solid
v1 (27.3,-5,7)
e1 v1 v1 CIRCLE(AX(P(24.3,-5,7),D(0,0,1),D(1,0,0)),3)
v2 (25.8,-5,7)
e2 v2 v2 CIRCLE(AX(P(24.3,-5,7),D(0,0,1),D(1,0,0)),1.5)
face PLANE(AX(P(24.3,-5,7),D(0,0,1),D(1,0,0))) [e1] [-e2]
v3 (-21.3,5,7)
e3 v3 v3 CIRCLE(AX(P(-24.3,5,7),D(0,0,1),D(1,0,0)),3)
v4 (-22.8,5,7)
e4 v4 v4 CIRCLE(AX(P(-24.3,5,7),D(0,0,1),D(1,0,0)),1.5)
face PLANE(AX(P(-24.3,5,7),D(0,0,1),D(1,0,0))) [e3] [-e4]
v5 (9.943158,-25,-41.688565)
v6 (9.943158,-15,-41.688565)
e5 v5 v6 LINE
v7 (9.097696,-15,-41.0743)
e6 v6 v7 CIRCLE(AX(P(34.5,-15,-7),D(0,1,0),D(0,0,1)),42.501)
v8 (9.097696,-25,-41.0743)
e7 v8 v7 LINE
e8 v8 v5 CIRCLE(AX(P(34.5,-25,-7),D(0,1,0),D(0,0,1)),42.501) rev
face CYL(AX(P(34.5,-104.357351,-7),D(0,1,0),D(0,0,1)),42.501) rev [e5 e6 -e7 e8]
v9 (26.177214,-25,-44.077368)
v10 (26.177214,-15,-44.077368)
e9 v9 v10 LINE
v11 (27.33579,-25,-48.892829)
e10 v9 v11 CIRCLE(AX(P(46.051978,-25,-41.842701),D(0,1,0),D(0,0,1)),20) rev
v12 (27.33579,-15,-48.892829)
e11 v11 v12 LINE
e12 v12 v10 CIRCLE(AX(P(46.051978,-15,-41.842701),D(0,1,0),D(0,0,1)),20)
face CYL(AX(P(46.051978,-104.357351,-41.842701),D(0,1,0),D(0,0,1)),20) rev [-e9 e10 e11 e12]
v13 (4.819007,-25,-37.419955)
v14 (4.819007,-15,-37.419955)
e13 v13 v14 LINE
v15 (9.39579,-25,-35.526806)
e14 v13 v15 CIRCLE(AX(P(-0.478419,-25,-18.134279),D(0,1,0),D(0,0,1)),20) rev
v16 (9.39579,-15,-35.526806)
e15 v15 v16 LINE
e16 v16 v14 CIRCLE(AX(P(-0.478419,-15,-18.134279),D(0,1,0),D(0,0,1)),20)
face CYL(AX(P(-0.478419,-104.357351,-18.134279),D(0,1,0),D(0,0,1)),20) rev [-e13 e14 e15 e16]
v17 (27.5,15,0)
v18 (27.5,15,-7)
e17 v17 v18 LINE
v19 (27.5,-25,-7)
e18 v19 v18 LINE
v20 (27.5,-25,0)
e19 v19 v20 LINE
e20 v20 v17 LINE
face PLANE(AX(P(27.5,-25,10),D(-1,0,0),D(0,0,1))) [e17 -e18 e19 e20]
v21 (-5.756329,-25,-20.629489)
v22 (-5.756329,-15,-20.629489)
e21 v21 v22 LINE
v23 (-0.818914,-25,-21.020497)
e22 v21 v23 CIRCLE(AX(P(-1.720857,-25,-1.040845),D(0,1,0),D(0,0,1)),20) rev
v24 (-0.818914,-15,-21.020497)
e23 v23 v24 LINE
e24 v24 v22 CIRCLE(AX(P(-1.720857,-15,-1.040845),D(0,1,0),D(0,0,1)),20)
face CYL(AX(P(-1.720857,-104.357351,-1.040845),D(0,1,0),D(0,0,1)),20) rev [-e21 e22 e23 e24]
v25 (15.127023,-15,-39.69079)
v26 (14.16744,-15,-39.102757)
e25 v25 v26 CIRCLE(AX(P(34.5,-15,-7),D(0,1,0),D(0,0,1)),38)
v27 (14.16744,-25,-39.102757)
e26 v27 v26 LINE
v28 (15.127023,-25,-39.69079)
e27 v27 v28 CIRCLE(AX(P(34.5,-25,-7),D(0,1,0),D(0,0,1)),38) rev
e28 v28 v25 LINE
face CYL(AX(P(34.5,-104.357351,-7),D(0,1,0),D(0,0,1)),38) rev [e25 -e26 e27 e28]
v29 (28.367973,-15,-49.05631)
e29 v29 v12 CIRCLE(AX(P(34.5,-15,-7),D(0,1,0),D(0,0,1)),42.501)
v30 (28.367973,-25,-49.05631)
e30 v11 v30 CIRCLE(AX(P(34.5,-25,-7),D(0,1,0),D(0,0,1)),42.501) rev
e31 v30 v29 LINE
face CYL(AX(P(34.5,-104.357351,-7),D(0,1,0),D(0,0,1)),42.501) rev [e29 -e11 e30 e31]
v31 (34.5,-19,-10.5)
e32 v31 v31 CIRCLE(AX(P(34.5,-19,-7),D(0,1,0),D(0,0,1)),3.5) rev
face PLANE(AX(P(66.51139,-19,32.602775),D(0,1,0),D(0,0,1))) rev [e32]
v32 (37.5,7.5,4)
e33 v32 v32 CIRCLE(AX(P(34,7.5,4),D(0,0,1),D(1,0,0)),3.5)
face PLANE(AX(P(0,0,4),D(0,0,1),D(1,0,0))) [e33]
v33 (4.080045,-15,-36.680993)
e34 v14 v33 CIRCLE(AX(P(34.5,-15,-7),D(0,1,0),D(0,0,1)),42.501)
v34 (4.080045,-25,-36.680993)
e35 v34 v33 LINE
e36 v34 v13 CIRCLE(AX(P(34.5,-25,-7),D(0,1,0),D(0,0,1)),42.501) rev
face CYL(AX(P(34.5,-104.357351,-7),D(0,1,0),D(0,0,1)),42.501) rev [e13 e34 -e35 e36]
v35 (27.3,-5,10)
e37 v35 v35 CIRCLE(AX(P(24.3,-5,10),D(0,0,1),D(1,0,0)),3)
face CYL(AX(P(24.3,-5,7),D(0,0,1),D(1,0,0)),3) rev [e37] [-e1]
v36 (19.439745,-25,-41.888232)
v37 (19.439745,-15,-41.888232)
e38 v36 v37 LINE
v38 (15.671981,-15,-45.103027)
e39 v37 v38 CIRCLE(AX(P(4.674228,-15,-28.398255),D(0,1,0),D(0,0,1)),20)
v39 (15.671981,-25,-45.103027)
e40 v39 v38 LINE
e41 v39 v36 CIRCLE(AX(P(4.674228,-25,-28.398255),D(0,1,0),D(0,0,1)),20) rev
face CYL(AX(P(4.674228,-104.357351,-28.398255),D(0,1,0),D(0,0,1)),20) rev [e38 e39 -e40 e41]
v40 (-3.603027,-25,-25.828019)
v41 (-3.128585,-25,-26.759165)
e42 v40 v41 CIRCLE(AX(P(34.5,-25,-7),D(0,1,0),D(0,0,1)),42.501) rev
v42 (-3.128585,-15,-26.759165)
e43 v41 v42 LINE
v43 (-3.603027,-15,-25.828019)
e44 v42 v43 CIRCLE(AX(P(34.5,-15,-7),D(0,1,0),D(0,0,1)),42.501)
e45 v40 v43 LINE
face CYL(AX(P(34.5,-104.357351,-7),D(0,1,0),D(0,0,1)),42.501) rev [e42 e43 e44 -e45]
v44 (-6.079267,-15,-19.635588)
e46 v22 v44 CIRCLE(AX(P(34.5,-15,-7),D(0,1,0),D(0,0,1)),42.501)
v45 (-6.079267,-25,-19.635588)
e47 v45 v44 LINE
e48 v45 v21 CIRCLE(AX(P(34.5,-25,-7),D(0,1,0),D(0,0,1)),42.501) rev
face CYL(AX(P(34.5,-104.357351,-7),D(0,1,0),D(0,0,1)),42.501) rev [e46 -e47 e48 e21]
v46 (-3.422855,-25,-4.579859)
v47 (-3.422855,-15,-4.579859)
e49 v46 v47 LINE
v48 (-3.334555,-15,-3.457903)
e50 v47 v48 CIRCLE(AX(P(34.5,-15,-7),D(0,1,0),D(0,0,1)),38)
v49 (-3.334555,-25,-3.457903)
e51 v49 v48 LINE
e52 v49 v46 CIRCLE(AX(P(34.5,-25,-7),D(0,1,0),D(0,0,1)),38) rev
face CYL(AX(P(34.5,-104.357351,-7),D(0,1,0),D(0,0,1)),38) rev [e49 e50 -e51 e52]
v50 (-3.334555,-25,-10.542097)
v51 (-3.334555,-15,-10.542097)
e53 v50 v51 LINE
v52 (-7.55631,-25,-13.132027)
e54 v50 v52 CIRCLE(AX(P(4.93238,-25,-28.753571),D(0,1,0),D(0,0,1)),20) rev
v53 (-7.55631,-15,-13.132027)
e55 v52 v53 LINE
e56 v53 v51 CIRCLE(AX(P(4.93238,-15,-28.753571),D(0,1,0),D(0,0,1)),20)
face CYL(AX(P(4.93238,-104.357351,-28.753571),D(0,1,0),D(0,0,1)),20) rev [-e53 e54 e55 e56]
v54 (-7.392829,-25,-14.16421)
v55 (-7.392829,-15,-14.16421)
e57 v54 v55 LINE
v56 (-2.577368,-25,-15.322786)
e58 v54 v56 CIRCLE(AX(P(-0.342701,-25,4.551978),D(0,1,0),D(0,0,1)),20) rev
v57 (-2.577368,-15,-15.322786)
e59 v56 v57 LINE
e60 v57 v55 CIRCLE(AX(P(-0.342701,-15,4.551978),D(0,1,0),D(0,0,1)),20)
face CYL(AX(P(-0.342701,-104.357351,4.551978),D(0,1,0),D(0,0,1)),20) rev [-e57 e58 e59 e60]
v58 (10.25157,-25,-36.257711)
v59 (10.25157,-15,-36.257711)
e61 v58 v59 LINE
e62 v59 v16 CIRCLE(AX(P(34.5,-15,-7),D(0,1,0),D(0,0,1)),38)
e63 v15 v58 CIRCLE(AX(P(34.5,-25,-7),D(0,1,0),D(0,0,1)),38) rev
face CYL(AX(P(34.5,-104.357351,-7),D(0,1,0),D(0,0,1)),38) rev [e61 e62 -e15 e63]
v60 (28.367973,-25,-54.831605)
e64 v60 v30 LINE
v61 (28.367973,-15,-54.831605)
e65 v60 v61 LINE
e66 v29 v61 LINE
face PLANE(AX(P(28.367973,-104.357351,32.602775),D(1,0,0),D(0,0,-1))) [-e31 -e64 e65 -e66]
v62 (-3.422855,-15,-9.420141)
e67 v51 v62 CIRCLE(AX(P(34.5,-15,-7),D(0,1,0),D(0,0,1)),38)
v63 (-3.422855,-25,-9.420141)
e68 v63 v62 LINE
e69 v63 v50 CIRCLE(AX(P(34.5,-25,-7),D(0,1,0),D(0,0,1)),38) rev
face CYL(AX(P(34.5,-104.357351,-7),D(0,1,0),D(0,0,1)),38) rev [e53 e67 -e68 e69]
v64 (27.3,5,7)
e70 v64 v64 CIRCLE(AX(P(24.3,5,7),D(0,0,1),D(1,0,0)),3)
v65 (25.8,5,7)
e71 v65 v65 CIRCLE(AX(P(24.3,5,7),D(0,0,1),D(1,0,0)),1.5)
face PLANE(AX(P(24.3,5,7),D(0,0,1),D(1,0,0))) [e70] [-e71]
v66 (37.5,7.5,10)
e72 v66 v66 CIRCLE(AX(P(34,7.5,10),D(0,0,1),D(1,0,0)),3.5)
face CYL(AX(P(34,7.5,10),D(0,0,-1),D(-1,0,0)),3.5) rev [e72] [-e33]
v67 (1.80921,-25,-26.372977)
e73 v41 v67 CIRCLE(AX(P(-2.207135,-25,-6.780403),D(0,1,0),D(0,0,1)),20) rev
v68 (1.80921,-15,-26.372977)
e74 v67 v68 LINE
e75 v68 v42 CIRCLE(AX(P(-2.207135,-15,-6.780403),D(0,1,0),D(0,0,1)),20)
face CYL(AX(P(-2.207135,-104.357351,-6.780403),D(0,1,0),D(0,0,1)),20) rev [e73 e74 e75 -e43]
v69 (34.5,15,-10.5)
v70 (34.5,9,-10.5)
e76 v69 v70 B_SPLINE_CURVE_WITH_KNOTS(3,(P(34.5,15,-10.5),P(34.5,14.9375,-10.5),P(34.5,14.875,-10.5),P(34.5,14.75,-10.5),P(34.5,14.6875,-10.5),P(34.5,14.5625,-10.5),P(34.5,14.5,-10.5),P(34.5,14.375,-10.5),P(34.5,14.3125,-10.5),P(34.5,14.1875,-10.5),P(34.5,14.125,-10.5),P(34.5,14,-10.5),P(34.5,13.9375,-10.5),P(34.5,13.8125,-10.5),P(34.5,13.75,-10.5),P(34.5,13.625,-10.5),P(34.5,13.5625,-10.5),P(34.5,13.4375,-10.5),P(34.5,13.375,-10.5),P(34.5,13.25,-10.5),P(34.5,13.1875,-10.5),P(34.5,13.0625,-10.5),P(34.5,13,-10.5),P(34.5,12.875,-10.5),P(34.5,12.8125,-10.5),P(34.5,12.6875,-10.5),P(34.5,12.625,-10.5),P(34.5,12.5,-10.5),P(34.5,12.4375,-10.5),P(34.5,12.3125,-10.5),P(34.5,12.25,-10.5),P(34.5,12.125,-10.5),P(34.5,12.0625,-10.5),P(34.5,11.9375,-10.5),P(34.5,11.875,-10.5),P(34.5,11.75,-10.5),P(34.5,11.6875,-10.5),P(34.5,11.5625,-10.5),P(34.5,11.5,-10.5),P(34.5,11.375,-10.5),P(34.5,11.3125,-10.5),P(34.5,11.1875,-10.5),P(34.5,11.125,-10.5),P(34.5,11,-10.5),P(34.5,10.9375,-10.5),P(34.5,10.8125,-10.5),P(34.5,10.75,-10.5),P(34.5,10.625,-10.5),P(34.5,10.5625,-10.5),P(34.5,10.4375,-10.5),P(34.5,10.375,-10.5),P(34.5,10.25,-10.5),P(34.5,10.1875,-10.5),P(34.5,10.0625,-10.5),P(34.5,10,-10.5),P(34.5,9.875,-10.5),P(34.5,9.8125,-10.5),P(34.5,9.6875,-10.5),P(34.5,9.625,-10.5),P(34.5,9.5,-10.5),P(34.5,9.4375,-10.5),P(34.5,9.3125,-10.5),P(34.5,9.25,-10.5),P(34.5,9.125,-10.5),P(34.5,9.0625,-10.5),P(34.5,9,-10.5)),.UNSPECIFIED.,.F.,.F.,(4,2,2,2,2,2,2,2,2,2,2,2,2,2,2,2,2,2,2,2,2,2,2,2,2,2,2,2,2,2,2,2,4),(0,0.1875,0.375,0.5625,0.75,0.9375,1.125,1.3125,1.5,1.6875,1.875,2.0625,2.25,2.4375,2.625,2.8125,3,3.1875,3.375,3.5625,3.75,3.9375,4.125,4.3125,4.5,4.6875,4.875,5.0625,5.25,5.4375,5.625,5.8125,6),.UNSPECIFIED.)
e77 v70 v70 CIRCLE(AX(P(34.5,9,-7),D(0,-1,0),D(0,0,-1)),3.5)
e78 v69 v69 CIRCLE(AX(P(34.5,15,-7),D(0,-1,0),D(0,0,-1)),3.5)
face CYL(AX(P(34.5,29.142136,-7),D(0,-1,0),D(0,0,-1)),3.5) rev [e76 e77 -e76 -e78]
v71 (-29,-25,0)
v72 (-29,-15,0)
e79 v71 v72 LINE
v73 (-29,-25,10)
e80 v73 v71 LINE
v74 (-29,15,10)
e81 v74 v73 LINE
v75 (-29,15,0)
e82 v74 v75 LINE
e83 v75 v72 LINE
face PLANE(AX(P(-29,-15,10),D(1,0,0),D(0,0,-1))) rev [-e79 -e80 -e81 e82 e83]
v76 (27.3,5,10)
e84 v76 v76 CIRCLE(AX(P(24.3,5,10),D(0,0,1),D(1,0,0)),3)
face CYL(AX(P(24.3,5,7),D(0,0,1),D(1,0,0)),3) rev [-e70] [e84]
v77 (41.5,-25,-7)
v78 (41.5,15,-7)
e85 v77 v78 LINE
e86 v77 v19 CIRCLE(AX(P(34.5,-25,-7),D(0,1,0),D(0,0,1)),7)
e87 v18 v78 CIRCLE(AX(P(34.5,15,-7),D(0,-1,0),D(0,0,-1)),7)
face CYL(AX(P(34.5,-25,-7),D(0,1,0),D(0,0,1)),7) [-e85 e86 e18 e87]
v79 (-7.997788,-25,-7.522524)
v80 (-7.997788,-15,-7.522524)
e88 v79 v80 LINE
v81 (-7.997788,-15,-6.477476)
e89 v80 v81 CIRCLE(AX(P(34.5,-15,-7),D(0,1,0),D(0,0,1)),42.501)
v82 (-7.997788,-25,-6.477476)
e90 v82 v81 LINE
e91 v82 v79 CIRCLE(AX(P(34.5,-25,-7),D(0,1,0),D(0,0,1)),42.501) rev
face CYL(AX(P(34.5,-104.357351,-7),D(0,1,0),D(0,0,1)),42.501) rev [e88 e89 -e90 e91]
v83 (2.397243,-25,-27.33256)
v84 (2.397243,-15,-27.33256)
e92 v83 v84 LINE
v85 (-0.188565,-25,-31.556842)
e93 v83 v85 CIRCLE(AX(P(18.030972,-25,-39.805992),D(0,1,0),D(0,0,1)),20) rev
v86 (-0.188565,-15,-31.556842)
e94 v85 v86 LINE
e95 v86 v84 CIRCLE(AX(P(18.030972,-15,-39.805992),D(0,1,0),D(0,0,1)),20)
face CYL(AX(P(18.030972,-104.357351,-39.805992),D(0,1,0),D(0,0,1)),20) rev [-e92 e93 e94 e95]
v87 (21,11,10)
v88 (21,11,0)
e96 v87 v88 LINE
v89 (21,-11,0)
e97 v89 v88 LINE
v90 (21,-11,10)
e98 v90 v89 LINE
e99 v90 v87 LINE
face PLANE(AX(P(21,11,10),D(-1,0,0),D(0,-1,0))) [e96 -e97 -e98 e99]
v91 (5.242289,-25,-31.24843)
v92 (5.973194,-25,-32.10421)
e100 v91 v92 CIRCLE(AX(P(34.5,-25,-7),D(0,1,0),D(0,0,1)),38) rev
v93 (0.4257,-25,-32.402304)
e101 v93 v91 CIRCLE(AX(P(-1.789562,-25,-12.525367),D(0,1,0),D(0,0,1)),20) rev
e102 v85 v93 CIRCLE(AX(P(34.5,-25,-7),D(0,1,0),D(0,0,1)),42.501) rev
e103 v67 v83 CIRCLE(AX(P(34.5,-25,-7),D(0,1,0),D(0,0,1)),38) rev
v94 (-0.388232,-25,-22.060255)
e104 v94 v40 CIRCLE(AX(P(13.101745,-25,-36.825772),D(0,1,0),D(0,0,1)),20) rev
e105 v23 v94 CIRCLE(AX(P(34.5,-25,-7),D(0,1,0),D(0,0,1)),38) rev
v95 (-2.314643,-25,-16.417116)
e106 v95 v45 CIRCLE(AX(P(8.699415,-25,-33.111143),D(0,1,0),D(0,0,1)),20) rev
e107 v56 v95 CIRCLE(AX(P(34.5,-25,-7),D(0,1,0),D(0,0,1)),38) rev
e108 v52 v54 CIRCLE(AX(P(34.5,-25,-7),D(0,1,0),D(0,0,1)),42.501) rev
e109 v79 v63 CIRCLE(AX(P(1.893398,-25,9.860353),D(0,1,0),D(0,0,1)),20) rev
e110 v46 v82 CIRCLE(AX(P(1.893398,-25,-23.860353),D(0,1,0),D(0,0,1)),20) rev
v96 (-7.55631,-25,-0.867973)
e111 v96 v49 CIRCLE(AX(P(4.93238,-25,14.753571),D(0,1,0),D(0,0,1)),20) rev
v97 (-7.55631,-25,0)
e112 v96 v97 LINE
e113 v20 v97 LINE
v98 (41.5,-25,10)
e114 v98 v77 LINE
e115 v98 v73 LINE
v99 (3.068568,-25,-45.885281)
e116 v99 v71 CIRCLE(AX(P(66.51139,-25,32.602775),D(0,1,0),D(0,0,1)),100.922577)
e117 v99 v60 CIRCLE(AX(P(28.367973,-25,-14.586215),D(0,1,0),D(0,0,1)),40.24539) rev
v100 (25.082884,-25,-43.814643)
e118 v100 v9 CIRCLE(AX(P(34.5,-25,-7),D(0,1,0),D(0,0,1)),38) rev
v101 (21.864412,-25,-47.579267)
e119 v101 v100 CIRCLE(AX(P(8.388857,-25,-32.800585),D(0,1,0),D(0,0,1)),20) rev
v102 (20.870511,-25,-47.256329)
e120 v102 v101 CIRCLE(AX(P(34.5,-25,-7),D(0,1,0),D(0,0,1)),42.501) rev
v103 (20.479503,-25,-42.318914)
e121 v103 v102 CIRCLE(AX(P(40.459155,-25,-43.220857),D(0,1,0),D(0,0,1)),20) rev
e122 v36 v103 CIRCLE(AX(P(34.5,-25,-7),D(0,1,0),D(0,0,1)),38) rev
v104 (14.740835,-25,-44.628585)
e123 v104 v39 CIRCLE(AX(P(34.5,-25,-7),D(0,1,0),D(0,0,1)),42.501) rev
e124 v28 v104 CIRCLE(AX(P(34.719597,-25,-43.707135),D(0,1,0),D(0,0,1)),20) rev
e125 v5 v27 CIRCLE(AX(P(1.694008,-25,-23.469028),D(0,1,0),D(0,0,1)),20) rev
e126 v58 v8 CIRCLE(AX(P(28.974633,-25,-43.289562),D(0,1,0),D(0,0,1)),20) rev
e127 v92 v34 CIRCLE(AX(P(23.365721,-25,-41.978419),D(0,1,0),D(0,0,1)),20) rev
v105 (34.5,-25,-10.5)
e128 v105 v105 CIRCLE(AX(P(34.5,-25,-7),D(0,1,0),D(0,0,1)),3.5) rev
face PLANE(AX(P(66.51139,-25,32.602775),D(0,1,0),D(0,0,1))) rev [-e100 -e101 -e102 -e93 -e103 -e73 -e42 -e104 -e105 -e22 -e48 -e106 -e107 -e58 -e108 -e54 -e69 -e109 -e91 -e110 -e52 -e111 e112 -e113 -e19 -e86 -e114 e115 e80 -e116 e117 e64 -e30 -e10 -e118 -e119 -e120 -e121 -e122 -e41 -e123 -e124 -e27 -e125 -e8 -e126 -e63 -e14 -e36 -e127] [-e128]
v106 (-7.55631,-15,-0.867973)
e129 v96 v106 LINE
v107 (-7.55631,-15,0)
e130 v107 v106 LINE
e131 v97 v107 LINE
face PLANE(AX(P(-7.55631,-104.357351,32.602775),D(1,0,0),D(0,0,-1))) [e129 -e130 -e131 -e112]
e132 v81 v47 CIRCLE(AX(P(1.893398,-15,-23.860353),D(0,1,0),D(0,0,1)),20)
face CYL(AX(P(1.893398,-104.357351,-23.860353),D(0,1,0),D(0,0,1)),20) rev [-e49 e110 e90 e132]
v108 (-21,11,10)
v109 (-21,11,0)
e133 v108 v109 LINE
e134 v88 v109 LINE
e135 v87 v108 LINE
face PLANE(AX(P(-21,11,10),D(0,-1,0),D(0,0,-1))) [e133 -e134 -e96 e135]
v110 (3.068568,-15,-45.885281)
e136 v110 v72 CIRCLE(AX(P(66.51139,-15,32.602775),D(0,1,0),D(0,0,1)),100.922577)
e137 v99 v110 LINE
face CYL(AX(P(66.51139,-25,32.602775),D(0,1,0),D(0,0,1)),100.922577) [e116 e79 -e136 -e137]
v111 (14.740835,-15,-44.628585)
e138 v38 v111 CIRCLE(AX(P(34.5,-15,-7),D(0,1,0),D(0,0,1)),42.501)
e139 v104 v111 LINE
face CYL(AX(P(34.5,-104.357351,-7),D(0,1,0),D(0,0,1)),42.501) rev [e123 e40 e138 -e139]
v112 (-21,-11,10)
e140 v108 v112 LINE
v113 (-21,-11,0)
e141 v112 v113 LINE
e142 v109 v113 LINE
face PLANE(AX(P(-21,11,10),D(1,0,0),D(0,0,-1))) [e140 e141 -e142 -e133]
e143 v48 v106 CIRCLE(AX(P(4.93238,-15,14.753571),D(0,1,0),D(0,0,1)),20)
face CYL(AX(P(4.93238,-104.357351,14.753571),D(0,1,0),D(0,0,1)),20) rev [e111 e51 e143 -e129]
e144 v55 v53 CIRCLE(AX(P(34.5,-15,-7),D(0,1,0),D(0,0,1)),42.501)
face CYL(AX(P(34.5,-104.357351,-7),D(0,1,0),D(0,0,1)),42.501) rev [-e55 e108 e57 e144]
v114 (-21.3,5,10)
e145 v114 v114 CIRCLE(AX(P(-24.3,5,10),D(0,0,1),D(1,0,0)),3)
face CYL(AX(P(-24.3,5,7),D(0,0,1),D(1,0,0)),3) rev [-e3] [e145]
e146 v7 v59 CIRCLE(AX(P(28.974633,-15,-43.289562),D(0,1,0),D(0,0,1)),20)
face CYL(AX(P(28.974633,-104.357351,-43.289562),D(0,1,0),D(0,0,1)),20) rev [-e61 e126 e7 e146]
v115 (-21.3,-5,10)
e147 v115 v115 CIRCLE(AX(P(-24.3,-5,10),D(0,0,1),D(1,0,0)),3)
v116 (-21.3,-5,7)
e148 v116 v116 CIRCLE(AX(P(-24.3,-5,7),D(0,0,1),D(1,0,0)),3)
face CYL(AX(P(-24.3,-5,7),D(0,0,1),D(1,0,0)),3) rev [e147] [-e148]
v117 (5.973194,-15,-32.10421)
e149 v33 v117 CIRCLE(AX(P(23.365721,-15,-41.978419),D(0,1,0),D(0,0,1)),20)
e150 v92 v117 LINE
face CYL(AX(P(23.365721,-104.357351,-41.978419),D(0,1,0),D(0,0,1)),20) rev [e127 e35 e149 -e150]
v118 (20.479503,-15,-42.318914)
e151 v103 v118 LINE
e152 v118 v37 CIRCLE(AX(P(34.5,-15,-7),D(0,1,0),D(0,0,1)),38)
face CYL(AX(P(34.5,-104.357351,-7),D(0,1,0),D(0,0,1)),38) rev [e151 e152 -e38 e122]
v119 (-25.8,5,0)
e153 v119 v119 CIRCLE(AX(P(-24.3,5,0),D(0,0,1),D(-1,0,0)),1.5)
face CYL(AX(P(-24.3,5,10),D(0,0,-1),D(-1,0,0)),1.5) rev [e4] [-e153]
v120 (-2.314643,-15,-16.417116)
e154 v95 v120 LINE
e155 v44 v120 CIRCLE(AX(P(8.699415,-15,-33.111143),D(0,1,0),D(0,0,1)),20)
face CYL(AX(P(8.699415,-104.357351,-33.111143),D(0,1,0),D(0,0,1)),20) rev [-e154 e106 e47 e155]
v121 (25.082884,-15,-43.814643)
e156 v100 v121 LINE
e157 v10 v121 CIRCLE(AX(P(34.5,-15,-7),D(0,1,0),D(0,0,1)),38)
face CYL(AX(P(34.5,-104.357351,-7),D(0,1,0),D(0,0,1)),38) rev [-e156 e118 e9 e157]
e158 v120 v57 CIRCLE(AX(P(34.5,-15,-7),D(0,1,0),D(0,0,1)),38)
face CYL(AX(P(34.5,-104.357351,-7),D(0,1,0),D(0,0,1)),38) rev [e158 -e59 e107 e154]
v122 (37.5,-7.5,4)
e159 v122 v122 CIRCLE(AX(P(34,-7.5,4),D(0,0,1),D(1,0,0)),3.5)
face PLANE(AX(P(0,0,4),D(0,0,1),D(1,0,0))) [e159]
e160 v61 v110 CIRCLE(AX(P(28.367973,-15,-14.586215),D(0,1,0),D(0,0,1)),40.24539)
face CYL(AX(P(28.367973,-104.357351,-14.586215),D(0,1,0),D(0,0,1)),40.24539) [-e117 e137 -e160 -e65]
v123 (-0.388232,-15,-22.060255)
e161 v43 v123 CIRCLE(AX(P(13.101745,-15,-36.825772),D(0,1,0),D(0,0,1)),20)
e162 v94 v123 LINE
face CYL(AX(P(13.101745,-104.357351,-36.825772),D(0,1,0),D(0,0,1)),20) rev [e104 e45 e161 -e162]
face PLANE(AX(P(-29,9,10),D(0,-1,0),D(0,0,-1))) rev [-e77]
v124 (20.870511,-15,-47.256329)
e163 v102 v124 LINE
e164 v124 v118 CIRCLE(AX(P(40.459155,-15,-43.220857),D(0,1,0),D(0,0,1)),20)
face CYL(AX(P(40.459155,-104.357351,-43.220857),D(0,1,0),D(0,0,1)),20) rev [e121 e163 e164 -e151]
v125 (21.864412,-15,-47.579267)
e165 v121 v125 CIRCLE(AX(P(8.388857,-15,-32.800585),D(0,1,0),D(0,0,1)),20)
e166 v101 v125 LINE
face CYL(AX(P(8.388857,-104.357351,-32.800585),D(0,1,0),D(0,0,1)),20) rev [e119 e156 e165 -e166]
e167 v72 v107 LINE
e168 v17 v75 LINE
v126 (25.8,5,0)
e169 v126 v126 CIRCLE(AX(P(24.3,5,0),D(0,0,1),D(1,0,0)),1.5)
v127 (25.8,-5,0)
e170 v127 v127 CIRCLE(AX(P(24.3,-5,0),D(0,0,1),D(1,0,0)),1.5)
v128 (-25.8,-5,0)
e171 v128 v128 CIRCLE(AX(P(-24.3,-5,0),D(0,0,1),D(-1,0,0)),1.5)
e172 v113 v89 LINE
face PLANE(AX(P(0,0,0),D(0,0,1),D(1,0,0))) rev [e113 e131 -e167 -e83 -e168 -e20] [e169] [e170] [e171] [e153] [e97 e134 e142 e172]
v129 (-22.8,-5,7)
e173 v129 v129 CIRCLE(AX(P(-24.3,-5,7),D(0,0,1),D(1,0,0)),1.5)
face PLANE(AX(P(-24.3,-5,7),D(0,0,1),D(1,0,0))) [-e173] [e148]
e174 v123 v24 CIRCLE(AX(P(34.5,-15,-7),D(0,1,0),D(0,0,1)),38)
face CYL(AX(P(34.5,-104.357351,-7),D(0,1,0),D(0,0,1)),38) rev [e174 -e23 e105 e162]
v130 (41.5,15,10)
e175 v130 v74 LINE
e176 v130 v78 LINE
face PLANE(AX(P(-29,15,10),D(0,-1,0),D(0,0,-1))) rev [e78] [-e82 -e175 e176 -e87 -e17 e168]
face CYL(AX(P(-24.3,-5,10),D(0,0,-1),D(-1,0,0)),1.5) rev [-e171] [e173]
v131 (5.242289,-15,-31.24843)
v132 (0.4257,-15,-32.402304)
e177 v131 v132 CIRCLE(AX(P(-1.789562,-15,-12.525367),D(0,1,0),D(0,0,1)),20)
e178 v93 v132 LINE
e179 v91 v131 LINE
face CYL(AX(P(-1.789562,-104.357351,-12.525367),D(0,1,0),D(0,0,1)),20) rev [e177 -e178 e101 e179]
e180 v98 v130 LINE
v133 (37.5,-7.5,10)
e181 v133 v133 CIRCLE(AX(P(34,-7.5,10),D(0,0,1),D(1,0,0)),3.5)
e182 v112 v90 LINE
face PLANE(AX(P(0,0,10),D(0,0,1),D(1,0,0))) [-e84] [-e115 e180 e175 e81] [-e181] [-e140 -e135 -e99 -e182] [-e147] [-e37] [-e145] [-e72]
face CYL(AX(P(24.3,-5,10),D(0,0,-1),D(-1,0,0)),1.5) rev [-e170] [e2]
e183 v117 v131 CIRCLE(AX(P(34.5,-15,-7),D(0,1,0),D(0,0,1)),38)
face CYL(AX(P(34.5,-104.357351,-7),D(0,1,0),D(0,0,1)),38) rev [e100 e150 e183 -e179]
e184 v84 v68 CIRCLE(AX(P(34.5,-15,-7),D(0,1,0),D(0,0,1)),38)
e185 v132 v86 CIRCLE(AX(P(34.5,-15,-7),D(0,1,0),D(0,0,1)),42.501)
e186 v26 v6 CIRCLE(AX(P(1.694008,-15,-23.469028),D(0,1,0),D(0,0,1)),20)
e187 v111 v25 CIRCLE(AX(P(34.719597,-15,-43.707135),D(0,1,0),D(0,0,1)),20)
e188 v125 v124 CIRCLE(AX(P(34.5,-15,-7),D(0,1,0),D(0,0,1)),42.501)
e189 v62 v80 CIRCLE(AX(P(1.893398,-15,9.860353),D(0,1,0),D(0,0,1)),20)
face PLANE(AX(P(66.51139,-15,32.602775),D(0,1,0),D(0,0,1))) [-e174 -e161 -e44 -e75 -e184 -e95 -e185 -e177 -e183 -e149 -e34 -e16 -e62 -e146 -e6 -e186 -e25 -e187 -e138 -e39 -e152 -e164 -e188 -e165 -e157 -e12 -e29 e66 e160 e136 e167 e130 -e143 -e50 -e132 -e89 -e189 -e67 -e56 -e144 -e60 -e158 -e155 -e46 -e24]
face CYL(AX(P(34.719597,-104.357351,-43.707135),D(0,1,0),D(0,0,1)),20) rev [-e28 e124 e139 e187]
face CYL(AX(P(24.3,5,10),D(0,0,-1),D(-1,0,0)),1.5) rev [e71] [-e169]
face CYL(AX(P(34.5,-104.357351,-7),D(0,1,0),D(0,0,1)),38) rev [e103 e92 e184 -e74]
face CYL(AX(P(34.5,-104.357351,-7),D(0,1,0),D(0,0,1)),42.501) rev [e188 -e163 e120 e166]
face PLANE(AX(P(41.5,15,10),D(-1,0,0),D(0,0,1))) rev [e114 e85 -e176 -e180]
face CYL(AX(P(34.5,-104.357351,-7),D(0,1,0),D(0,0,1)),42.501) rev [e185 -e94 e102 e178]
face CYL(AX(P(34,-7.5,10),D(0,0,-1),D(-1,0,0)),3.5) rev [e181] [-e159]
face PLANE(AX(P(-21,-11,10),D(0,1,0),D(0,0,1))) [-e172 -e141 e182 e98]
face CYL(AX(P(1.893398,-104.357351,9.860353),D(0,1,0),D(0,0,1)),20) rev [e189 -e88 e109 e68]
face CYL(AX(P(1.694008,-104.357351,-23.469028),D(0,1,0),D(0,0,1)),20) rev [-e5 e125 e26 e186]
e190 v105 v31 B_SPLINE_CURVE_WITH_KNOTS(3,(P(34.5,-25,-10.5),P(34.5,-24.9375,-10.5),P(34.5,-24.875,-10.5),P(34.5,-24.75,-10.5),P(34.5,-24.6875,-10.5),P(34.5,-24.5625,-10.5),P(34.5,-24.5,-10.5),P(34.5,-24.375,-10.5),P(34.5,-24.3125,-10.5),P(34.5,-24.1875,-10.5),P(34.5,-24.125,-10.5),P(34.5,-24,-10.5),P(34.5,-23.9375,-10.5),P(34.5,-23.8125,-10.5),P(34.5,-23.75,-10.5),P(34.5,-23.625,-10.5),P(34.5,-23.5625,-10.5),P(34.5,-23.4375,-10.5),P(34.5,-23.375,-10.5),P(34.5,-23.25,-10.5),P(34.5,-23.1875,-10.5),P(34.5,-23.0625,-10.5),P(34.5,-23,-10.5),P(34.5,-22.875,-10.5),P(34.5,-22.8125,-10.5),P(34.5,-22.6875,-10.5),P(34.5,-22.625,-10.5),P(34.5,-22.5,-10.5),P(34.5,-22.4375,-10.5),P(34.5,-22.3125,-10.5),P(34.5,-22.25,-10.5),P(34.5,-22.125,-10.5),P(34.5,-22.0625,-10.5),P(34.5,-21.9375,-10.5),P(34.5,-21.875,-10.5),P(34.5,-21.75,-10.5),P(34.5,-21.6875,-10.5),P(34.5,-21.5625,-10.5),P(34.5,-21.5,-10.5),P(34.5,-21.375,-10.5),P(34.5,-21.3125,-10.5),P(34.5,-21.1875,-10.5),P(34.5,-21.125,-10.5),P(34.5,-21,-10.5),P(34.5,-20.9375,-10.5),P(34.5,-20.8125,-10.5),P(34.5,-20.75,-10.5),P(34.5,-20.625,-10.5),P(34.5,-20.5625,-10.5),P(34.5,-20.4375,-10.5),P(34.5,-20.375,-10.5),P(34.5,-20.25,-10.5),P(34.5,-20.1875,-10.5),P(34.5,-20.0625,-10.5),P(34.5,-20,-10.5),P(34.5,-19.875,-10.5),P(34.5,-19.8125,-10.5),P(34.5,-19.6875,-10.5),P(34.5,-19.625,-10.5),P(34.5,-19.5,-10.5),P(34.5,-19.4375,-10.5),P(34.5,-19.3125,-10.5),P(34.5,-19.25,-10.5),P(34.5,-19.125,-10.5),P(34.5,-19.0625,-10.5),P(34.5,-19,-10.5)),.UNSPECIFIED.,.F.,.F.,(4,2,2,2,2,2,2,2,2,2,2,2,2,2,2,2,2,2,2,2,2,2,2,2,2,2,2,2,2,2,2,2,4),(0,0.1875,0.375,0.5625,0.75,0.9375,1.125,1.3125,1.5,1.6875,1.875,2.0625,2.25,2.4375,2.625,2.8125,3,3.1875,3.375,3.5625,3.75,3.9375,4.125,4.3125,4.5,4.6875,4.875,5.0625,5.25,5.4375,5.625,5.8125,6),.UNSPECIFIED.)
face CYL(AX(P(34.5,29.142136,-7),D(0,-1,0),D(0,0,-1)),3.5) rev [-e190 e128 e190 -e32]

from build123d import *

# Parameters (mm, degrees)
SKETCH1_R                = 3.5
SKETCH1_R_2              = 1.5
SKETCH1_W                = 42
SKETCH1_H                = 22
BOSS_EXTRUDE1_DEPTH      = 10
CUT_EXTRUDE1_START       = 7
SKETCH2_R                = 3
CUT_EXTRUDE1_DEPTH       = 3
BOSS_EXTRUDE2_START      = -15
SKETCH4_R                = 5
BOSS_EXTRUDE2_DEPTH      = 10
BOSS_EXTRUDE3_DEPTH      = 15
BOSS_EXTRUDE3_DEPTH_BACK = 25
SKETCH4_3_R              = 5
SKETCH1_3_R              = 3.5
BOSS_EXTRUDE4_DEPTH      = 4
BOSS_EXTRUDE5_START      = -15
BOSS_EXTRUDE5_DEPTH      = 10
BOSS_EXTRUDE6_DEPTH      = 15
BOSS_EXTRUDE6_DEPTH_BACK = 25
SKETCH6_R                = 5
SKETCH6_R_2              = 3.5
BOSS_EXTRUDE7_START      = -19
SKETCH6_2_R              = 3.5
BOSS_EXTRUDE7_DEPTH      = 28


with BuildPart() as part:
    # Sketch1 → Boss-Extrude1 (new body)
    with BuildSketch(Plane.XY):
        Polygon((34, -15), (-29, -15), (-29, 15), (34, 15), (41.5, 15), (41.5, 7.5), (41.5, -7.5), (41.5, -15), align=None)
        with Locations((34, -7.5)):
            Circle(SKETCH1_R, mode=Mode.SUBTRACT)
        with Locations((34, 7.5)):
            Circle(SKETCH1_R, mode=Mode.SUBTRACT)
        with Locations((24.3, 5)):
            Circle(SKETCH1_R_2, mode=Mode.SUBTRACT)
        with Locations((24.3, -5)):
            Circle(SKETCH1_R_2, mode=Mode.SUBTRACT)
        with Locations(Location((-24.3, -5, 0), (0, 0, 180))):
            Circle(SKETCH1_R_2, mode=Mode.SUBTRACT)
        with Locations(Location((-24.3, 5, 0), (0, 0, 180))):
            Circle(SKETCH1_R_2, mode=Mode.SUBTRACT)
        Rectangle(SKETCH1_W, SKETCH1_H, mode=Mode.SUBTRACT)
    extrude(amount=BOSS_EXTRUDE1_DEPTH)

    # Sketch2 → Cut-Extrude1 (cut)
    with BuildSketch(Plane.XY.offset(CUT_EXTRUDE1_START)):
        with Locations((-24.3, 5)):
            Circle(SKETCH2_R)
        with Locations((-24.3, -5)):
            Circle(SKETCH2_R)
        with Locations((24.3, 5)):
            Circle(SKETCH2_R)
        with Locations((24.3, -5)):
            Circle(SKETCH2_R)
    extrude(amount=CUT_EXTRUDE1_DEPTH, mode=Mode.SUBTRACT)

    # Sketch4 → Boss-Extrude2 (add)
    # profile 1 of 3: a face of its own
    with BuildSketch(Plane(origin=(0, 0, 0), x_dir=(1, 0, 0), z_dir=(0, 1, 0)).offset(BOSS_EXTRUDE2_START)):
        with BuildLine():
            Line((41.5, 0), (41.5, 7))
            ThreePointArc((41.5, 7), (34.5, 14), (27.5, 7))
            Line((27.5, 7), (27.5, 0))
            Line((27.5, 0), (41.5, 0))
        make_face()
        with Locations((34.5, 7)):
            Circle(SKETCH4_R, mode=Mode.SUBTRACT)
    # profile 2 of 3: a face of its own
    with BuildSketch(Plane(origin=(0, 0, 0), x_dir=(1, 0, 0), z_dir=(0, 1, 0)).offset(BOSS_EXTRUDE2_START)):
        Polygon((-29, -10), (-29, 0), (27.5, 0), (41.5, 0), (41.5, -10), align=None)
    # profile 3 of 3: a face of its own
    with BuildSketch(Plane(origin=(0, 0, 0), x_dir=(1, 0, 0), z_dir=(0, 1, 0)).offset(BOSS_EXTRUDE2_START)):
        with BuildLine():
            Line((-29, 0), (-9.952221542, 0))
            ThreePointArc((-9.952221542, 0), (-7.49675311, 23.163932944), (6.211711403, 41.99675311))
            Line((6.211711403, 41.99675311), (3.068568225, 45.885281233))
            ThreePointArc((3.068568225, 45.885281233), (-16.210887038, 25.210644422), (-29, 0))
        make_face()
    extrude(amount=-BOSS_EXTRUDE2_DEPTH)

    # Sketch4<3> → Boss-Extrude3 (add, two sides: drawn at the far end of the back side and taken through both)
    with BuildSketch(Plane(origin=(0, 0, 0), x_dir=(1, 0, 0), z_dir=(0, 1, 0)).offset(-BOSS_EXTRUDE3_DEPTH_BACK)):
        with BuildLine():
            Line((41.5, 0), (41.5, 7))
            ThreePointArc((41.5, 7), (34.5, 14), (27.5, 7))
            Line((27.5, 7), (27.5, 0))
            Line((27.5, 0), (41.5, 0))
        make_face()
        with Locations((34.5, 7)):
            Circle(SKETCH4_3_R, mode=Mode.SUBTRACT)
    extrude(amount=BOSS_EXTRUDE3_DEPTH + BOSS_EXTRUDE3_DEPTH_BACK)

    # Sketch1<3> → Boss-Extrude4 (add)
    with BuildSketch(Plane.XY):
        with Locations((34, 7.5)):
            Circle(SKETCH1_3_R)
        with Locations((34, -7.5)):
            Circle(SKETCH1_3_R)
    extrude(amount=BOSS_EXTRUDE4_DEPTH)

    # Sketch5 → Boss-Extrude5 (add)
    with BuildSketch(Plane(origin=(0, 0, 0), x_dir=(1, 0, 0), z_dir=(0, 1, 0)).offset(BOSS_EXTRUDE5_START)):
        with BuildLine():
            Line((-7.556310354, 0), (-29, 0))
            ThreePointArc((-29, 0), (-16.210887038, 25.210644422), (3.068568225, 45.885281233))
            ThreePointArc((3.068568225, 45.885281233), (14.95066501, 52.529162568), (28.36797257, 54.831604973))
            Line((28.36797257, 54.831604973), (28.36797257, 51.580244948))
            Line((28.36797257, 51.580244948), (28.36797257, 49.056310354))
            ThreePointArc((28.36797257, 49.056310354), (27.851378801, 48.977742164), (27.335790025, 48.892828699))
            ThreePointArc((27.335790025, 48.892828699), (26.606861218, 46.521101207), (26.177213589, 44.077368115))
            ThreePointArc((26.177213589, 44.077368115), (25.629076173, 43.950056975), (25.082884112, 43.814642852))
            ThreePointArc((25.082884112, 43.814642852), (23.590633664, 45.796969038), (21.864411592, 47.579266955))
            ThreePointArc((21.864411592, 47.579266955), (21.366468722, 47.420852999), (20.870511092, 47.256329106))
            ThreePointArc((20.870511092, 47.256329106), (20.521576529, 44.799771926), (20.479502655, 42.318913548))
            ThreePointArc((20.479502655, 42.318913548), (19.95802957, 42.107422235), (19.439745475, 41.888232022))
            ThreePointArc((19.439745475, 41.888232022), (17.65576297, 43.612713083), (15.671980735, 45.103027328))
            ThreePointArc((15.671980735, 45.103027328), (15.204949771, 44.868668285), (14.740835409, 44.628585087))
            ThreePointArc((14.740835409, 44.628585087), (14.780487018, 42.147686811), (15.127022896, 39.690790112))
            ThreePointArc((15.127022896, 39.690790112), (14.645054541, 39.400326245), (14.167440286, 39.102757132))
            ThreePointArc((14.167440286, 39.102757132), (12.135653294, 40.526930621), (9.943158199, 41.688564712))
            ThreePointArc((9.943158199, 41.688564712), (9.518538992, 41.384031278), (9.097695935, 41.074300421))
            ThreePointArc((9.097695935, 41.074300421), (9.524957362, 38.630148998), (10.251570129, 36.257710929))
            ThreePointArc((10.251570129, 36.257710929), (9.820974163, 35.895426693), (9.395790198, 35.526805819))
            ThreePointArc((9.395790198, 35.526805819), (7.166228058, 36.615603857), (4.819006607, 37.419954507))
            ThreePointArc((4.819006607, 37.419954507), (4.447254693, 37.052745307), (4.080045493, 36.680993393))
            ThreePointArc((4.080045493, 36.680993393), (4.884396143, 34.333771942), (5.973194181, 32.104209802))
            ThreePointArc((5.973194181, 32.104209802), (5.604573307, 31.679025837), (5.242289071, 31.248429871))
            ThreePointArc((5.242289071, 31.248429871), (2.869851002, 31.975042638), (0.425699579, 32.402304065))
            ThreePointArc((0.425699579, 32.402304065), (0.115968722, 31.981461008), (-0.188564712, 31.556841801))
            ThreePointArc((-0.188564712, 31.556841801), (0.973069379, 29.364346706), (2.397242868, 27.332559714))
            ThreePointArc((2.397242868, 27.332559714), (2.099673755, 26.854945459), (1.809209888, 26.372977104))
            ThreePointArc((1.809209888, 26.372977104), (-0.647686811, 26.719512982), (-3.128585087, 26.759164591))
            ThreePointArc((-3.128585087, 26.759164591), (-3.368668285, 26.295050229), (-3.603027328, 25.828019265))
            ThreePointArc((-3.603027328, 25.828019265), (-2.112713083, 23.84423703), (-0.388232022, 22.060254525))
            ThreePointArc((-0.388232022, 22.060254525), (-0.607422235, 21.54197043), (-0.818913548, 21.020497345))
            ThreePointArc((-0.818913548, 21.020497345), (-3.299771926, 20.978423471), (-5.756329106, 20.629488908))
            ThreePointArc((-5.756329106, 20.629488908), (-5.920852999, 20.133531278), (-6.079266955, 19.635588408))
            ThreePointArc((-6.079266955, 19.635588408), (-4.296969038, 17.909366336), (-2.314642852, 16.417115888))
            ThreePointArc((-2.314642852, 16.417115888), (-2.450056975, 15.870923827), (-2.577368115, 15.322786411))
            ThreePointArc((-2.577368115, 15.322786411), (-5.021101207, 14.893138782), (-7.392828699, 14.164209975))
            ThreePointArc((-7.392828699, 14.164209975), (-7.477742164, 13.648621199), (-7.556310354, 13.13202743))
            ThreePointArc((-7.556310354, 13.13202743), (-5.525914856, 11.705870837), (-3.334554995, 10.542096605))
            ThreePointArc((-3.334554995, 10.542096605), (-3.382858682, 9.981445638), (-3.422854827, 9.420140853))
            ThreePointArc((-3.422854827, 9.420140853), (-5.769289812, 8.613498821), (-7.997787816, 7.522524415))
            ThreePointArc((-7.997787816, 7.522524415), (-8.001, 7), (-7.997787816, 6.477475585))
            ThreePointArc((-7.997787816, 6.477475585), (-5.769289812, 5.386501179), (-3.422854827, 4.579859147))
            ThreePointArc((-3.422854827, 4.579859147), (-3.382858682, 4.018554362), (-3.334554995, 3.457903395))
            ThreePointArc((-3.334554995, 3.457903395), (-5.525914856, 2.294129163), (-7.556310354, 0.86797257))
            Line((-7.556310354, 0.86797257), (-7.556310354, 0))
        make_face()
    extrude(amount=-BOSS_EXTRUDE5_DEPTH)

    # Sketch6 → Boss-Extrude6 (add, two sides: drawn at the far end of the back side and taken through both)
    with BuildSketch(Plane(origin=(0, 0, 0), x_dir=(1, 0, 0), z_dir=(0, 1, 0)).offset(-BOSS_EXTRUDE6_DEPTH_BACK)):
        with Locations((34.5, 7)):
            Circle(SKETCH6_R)
        with Locations(Location((34.5, 7, 0), (0, 0, 90))):
            Circle(SKETCH6_R_2, mode=Mode.SUBTRACT)
    extrude(amount=BOSS_EXTRUDE6_DEPTH + BOSS_EXTRUDE6_DEPTH_BACK)

    # Sketch6<2> → Boss-Extrude7 (add)
    with BuildSketch(Plane(origin=(0, 0, 0), x_dir=(1, 0, 0), z_dir=(0, 1, 0)).offset(BOSS_EXTRUDE7_START)):
        with Locations(Location((34.5, 7, 0), (0, 0, 90))):
            Circle(SKETCH6_2_R)
    extrude(amount=BOSS_EXTRUDE7_DEPTH)


solid = part.part
